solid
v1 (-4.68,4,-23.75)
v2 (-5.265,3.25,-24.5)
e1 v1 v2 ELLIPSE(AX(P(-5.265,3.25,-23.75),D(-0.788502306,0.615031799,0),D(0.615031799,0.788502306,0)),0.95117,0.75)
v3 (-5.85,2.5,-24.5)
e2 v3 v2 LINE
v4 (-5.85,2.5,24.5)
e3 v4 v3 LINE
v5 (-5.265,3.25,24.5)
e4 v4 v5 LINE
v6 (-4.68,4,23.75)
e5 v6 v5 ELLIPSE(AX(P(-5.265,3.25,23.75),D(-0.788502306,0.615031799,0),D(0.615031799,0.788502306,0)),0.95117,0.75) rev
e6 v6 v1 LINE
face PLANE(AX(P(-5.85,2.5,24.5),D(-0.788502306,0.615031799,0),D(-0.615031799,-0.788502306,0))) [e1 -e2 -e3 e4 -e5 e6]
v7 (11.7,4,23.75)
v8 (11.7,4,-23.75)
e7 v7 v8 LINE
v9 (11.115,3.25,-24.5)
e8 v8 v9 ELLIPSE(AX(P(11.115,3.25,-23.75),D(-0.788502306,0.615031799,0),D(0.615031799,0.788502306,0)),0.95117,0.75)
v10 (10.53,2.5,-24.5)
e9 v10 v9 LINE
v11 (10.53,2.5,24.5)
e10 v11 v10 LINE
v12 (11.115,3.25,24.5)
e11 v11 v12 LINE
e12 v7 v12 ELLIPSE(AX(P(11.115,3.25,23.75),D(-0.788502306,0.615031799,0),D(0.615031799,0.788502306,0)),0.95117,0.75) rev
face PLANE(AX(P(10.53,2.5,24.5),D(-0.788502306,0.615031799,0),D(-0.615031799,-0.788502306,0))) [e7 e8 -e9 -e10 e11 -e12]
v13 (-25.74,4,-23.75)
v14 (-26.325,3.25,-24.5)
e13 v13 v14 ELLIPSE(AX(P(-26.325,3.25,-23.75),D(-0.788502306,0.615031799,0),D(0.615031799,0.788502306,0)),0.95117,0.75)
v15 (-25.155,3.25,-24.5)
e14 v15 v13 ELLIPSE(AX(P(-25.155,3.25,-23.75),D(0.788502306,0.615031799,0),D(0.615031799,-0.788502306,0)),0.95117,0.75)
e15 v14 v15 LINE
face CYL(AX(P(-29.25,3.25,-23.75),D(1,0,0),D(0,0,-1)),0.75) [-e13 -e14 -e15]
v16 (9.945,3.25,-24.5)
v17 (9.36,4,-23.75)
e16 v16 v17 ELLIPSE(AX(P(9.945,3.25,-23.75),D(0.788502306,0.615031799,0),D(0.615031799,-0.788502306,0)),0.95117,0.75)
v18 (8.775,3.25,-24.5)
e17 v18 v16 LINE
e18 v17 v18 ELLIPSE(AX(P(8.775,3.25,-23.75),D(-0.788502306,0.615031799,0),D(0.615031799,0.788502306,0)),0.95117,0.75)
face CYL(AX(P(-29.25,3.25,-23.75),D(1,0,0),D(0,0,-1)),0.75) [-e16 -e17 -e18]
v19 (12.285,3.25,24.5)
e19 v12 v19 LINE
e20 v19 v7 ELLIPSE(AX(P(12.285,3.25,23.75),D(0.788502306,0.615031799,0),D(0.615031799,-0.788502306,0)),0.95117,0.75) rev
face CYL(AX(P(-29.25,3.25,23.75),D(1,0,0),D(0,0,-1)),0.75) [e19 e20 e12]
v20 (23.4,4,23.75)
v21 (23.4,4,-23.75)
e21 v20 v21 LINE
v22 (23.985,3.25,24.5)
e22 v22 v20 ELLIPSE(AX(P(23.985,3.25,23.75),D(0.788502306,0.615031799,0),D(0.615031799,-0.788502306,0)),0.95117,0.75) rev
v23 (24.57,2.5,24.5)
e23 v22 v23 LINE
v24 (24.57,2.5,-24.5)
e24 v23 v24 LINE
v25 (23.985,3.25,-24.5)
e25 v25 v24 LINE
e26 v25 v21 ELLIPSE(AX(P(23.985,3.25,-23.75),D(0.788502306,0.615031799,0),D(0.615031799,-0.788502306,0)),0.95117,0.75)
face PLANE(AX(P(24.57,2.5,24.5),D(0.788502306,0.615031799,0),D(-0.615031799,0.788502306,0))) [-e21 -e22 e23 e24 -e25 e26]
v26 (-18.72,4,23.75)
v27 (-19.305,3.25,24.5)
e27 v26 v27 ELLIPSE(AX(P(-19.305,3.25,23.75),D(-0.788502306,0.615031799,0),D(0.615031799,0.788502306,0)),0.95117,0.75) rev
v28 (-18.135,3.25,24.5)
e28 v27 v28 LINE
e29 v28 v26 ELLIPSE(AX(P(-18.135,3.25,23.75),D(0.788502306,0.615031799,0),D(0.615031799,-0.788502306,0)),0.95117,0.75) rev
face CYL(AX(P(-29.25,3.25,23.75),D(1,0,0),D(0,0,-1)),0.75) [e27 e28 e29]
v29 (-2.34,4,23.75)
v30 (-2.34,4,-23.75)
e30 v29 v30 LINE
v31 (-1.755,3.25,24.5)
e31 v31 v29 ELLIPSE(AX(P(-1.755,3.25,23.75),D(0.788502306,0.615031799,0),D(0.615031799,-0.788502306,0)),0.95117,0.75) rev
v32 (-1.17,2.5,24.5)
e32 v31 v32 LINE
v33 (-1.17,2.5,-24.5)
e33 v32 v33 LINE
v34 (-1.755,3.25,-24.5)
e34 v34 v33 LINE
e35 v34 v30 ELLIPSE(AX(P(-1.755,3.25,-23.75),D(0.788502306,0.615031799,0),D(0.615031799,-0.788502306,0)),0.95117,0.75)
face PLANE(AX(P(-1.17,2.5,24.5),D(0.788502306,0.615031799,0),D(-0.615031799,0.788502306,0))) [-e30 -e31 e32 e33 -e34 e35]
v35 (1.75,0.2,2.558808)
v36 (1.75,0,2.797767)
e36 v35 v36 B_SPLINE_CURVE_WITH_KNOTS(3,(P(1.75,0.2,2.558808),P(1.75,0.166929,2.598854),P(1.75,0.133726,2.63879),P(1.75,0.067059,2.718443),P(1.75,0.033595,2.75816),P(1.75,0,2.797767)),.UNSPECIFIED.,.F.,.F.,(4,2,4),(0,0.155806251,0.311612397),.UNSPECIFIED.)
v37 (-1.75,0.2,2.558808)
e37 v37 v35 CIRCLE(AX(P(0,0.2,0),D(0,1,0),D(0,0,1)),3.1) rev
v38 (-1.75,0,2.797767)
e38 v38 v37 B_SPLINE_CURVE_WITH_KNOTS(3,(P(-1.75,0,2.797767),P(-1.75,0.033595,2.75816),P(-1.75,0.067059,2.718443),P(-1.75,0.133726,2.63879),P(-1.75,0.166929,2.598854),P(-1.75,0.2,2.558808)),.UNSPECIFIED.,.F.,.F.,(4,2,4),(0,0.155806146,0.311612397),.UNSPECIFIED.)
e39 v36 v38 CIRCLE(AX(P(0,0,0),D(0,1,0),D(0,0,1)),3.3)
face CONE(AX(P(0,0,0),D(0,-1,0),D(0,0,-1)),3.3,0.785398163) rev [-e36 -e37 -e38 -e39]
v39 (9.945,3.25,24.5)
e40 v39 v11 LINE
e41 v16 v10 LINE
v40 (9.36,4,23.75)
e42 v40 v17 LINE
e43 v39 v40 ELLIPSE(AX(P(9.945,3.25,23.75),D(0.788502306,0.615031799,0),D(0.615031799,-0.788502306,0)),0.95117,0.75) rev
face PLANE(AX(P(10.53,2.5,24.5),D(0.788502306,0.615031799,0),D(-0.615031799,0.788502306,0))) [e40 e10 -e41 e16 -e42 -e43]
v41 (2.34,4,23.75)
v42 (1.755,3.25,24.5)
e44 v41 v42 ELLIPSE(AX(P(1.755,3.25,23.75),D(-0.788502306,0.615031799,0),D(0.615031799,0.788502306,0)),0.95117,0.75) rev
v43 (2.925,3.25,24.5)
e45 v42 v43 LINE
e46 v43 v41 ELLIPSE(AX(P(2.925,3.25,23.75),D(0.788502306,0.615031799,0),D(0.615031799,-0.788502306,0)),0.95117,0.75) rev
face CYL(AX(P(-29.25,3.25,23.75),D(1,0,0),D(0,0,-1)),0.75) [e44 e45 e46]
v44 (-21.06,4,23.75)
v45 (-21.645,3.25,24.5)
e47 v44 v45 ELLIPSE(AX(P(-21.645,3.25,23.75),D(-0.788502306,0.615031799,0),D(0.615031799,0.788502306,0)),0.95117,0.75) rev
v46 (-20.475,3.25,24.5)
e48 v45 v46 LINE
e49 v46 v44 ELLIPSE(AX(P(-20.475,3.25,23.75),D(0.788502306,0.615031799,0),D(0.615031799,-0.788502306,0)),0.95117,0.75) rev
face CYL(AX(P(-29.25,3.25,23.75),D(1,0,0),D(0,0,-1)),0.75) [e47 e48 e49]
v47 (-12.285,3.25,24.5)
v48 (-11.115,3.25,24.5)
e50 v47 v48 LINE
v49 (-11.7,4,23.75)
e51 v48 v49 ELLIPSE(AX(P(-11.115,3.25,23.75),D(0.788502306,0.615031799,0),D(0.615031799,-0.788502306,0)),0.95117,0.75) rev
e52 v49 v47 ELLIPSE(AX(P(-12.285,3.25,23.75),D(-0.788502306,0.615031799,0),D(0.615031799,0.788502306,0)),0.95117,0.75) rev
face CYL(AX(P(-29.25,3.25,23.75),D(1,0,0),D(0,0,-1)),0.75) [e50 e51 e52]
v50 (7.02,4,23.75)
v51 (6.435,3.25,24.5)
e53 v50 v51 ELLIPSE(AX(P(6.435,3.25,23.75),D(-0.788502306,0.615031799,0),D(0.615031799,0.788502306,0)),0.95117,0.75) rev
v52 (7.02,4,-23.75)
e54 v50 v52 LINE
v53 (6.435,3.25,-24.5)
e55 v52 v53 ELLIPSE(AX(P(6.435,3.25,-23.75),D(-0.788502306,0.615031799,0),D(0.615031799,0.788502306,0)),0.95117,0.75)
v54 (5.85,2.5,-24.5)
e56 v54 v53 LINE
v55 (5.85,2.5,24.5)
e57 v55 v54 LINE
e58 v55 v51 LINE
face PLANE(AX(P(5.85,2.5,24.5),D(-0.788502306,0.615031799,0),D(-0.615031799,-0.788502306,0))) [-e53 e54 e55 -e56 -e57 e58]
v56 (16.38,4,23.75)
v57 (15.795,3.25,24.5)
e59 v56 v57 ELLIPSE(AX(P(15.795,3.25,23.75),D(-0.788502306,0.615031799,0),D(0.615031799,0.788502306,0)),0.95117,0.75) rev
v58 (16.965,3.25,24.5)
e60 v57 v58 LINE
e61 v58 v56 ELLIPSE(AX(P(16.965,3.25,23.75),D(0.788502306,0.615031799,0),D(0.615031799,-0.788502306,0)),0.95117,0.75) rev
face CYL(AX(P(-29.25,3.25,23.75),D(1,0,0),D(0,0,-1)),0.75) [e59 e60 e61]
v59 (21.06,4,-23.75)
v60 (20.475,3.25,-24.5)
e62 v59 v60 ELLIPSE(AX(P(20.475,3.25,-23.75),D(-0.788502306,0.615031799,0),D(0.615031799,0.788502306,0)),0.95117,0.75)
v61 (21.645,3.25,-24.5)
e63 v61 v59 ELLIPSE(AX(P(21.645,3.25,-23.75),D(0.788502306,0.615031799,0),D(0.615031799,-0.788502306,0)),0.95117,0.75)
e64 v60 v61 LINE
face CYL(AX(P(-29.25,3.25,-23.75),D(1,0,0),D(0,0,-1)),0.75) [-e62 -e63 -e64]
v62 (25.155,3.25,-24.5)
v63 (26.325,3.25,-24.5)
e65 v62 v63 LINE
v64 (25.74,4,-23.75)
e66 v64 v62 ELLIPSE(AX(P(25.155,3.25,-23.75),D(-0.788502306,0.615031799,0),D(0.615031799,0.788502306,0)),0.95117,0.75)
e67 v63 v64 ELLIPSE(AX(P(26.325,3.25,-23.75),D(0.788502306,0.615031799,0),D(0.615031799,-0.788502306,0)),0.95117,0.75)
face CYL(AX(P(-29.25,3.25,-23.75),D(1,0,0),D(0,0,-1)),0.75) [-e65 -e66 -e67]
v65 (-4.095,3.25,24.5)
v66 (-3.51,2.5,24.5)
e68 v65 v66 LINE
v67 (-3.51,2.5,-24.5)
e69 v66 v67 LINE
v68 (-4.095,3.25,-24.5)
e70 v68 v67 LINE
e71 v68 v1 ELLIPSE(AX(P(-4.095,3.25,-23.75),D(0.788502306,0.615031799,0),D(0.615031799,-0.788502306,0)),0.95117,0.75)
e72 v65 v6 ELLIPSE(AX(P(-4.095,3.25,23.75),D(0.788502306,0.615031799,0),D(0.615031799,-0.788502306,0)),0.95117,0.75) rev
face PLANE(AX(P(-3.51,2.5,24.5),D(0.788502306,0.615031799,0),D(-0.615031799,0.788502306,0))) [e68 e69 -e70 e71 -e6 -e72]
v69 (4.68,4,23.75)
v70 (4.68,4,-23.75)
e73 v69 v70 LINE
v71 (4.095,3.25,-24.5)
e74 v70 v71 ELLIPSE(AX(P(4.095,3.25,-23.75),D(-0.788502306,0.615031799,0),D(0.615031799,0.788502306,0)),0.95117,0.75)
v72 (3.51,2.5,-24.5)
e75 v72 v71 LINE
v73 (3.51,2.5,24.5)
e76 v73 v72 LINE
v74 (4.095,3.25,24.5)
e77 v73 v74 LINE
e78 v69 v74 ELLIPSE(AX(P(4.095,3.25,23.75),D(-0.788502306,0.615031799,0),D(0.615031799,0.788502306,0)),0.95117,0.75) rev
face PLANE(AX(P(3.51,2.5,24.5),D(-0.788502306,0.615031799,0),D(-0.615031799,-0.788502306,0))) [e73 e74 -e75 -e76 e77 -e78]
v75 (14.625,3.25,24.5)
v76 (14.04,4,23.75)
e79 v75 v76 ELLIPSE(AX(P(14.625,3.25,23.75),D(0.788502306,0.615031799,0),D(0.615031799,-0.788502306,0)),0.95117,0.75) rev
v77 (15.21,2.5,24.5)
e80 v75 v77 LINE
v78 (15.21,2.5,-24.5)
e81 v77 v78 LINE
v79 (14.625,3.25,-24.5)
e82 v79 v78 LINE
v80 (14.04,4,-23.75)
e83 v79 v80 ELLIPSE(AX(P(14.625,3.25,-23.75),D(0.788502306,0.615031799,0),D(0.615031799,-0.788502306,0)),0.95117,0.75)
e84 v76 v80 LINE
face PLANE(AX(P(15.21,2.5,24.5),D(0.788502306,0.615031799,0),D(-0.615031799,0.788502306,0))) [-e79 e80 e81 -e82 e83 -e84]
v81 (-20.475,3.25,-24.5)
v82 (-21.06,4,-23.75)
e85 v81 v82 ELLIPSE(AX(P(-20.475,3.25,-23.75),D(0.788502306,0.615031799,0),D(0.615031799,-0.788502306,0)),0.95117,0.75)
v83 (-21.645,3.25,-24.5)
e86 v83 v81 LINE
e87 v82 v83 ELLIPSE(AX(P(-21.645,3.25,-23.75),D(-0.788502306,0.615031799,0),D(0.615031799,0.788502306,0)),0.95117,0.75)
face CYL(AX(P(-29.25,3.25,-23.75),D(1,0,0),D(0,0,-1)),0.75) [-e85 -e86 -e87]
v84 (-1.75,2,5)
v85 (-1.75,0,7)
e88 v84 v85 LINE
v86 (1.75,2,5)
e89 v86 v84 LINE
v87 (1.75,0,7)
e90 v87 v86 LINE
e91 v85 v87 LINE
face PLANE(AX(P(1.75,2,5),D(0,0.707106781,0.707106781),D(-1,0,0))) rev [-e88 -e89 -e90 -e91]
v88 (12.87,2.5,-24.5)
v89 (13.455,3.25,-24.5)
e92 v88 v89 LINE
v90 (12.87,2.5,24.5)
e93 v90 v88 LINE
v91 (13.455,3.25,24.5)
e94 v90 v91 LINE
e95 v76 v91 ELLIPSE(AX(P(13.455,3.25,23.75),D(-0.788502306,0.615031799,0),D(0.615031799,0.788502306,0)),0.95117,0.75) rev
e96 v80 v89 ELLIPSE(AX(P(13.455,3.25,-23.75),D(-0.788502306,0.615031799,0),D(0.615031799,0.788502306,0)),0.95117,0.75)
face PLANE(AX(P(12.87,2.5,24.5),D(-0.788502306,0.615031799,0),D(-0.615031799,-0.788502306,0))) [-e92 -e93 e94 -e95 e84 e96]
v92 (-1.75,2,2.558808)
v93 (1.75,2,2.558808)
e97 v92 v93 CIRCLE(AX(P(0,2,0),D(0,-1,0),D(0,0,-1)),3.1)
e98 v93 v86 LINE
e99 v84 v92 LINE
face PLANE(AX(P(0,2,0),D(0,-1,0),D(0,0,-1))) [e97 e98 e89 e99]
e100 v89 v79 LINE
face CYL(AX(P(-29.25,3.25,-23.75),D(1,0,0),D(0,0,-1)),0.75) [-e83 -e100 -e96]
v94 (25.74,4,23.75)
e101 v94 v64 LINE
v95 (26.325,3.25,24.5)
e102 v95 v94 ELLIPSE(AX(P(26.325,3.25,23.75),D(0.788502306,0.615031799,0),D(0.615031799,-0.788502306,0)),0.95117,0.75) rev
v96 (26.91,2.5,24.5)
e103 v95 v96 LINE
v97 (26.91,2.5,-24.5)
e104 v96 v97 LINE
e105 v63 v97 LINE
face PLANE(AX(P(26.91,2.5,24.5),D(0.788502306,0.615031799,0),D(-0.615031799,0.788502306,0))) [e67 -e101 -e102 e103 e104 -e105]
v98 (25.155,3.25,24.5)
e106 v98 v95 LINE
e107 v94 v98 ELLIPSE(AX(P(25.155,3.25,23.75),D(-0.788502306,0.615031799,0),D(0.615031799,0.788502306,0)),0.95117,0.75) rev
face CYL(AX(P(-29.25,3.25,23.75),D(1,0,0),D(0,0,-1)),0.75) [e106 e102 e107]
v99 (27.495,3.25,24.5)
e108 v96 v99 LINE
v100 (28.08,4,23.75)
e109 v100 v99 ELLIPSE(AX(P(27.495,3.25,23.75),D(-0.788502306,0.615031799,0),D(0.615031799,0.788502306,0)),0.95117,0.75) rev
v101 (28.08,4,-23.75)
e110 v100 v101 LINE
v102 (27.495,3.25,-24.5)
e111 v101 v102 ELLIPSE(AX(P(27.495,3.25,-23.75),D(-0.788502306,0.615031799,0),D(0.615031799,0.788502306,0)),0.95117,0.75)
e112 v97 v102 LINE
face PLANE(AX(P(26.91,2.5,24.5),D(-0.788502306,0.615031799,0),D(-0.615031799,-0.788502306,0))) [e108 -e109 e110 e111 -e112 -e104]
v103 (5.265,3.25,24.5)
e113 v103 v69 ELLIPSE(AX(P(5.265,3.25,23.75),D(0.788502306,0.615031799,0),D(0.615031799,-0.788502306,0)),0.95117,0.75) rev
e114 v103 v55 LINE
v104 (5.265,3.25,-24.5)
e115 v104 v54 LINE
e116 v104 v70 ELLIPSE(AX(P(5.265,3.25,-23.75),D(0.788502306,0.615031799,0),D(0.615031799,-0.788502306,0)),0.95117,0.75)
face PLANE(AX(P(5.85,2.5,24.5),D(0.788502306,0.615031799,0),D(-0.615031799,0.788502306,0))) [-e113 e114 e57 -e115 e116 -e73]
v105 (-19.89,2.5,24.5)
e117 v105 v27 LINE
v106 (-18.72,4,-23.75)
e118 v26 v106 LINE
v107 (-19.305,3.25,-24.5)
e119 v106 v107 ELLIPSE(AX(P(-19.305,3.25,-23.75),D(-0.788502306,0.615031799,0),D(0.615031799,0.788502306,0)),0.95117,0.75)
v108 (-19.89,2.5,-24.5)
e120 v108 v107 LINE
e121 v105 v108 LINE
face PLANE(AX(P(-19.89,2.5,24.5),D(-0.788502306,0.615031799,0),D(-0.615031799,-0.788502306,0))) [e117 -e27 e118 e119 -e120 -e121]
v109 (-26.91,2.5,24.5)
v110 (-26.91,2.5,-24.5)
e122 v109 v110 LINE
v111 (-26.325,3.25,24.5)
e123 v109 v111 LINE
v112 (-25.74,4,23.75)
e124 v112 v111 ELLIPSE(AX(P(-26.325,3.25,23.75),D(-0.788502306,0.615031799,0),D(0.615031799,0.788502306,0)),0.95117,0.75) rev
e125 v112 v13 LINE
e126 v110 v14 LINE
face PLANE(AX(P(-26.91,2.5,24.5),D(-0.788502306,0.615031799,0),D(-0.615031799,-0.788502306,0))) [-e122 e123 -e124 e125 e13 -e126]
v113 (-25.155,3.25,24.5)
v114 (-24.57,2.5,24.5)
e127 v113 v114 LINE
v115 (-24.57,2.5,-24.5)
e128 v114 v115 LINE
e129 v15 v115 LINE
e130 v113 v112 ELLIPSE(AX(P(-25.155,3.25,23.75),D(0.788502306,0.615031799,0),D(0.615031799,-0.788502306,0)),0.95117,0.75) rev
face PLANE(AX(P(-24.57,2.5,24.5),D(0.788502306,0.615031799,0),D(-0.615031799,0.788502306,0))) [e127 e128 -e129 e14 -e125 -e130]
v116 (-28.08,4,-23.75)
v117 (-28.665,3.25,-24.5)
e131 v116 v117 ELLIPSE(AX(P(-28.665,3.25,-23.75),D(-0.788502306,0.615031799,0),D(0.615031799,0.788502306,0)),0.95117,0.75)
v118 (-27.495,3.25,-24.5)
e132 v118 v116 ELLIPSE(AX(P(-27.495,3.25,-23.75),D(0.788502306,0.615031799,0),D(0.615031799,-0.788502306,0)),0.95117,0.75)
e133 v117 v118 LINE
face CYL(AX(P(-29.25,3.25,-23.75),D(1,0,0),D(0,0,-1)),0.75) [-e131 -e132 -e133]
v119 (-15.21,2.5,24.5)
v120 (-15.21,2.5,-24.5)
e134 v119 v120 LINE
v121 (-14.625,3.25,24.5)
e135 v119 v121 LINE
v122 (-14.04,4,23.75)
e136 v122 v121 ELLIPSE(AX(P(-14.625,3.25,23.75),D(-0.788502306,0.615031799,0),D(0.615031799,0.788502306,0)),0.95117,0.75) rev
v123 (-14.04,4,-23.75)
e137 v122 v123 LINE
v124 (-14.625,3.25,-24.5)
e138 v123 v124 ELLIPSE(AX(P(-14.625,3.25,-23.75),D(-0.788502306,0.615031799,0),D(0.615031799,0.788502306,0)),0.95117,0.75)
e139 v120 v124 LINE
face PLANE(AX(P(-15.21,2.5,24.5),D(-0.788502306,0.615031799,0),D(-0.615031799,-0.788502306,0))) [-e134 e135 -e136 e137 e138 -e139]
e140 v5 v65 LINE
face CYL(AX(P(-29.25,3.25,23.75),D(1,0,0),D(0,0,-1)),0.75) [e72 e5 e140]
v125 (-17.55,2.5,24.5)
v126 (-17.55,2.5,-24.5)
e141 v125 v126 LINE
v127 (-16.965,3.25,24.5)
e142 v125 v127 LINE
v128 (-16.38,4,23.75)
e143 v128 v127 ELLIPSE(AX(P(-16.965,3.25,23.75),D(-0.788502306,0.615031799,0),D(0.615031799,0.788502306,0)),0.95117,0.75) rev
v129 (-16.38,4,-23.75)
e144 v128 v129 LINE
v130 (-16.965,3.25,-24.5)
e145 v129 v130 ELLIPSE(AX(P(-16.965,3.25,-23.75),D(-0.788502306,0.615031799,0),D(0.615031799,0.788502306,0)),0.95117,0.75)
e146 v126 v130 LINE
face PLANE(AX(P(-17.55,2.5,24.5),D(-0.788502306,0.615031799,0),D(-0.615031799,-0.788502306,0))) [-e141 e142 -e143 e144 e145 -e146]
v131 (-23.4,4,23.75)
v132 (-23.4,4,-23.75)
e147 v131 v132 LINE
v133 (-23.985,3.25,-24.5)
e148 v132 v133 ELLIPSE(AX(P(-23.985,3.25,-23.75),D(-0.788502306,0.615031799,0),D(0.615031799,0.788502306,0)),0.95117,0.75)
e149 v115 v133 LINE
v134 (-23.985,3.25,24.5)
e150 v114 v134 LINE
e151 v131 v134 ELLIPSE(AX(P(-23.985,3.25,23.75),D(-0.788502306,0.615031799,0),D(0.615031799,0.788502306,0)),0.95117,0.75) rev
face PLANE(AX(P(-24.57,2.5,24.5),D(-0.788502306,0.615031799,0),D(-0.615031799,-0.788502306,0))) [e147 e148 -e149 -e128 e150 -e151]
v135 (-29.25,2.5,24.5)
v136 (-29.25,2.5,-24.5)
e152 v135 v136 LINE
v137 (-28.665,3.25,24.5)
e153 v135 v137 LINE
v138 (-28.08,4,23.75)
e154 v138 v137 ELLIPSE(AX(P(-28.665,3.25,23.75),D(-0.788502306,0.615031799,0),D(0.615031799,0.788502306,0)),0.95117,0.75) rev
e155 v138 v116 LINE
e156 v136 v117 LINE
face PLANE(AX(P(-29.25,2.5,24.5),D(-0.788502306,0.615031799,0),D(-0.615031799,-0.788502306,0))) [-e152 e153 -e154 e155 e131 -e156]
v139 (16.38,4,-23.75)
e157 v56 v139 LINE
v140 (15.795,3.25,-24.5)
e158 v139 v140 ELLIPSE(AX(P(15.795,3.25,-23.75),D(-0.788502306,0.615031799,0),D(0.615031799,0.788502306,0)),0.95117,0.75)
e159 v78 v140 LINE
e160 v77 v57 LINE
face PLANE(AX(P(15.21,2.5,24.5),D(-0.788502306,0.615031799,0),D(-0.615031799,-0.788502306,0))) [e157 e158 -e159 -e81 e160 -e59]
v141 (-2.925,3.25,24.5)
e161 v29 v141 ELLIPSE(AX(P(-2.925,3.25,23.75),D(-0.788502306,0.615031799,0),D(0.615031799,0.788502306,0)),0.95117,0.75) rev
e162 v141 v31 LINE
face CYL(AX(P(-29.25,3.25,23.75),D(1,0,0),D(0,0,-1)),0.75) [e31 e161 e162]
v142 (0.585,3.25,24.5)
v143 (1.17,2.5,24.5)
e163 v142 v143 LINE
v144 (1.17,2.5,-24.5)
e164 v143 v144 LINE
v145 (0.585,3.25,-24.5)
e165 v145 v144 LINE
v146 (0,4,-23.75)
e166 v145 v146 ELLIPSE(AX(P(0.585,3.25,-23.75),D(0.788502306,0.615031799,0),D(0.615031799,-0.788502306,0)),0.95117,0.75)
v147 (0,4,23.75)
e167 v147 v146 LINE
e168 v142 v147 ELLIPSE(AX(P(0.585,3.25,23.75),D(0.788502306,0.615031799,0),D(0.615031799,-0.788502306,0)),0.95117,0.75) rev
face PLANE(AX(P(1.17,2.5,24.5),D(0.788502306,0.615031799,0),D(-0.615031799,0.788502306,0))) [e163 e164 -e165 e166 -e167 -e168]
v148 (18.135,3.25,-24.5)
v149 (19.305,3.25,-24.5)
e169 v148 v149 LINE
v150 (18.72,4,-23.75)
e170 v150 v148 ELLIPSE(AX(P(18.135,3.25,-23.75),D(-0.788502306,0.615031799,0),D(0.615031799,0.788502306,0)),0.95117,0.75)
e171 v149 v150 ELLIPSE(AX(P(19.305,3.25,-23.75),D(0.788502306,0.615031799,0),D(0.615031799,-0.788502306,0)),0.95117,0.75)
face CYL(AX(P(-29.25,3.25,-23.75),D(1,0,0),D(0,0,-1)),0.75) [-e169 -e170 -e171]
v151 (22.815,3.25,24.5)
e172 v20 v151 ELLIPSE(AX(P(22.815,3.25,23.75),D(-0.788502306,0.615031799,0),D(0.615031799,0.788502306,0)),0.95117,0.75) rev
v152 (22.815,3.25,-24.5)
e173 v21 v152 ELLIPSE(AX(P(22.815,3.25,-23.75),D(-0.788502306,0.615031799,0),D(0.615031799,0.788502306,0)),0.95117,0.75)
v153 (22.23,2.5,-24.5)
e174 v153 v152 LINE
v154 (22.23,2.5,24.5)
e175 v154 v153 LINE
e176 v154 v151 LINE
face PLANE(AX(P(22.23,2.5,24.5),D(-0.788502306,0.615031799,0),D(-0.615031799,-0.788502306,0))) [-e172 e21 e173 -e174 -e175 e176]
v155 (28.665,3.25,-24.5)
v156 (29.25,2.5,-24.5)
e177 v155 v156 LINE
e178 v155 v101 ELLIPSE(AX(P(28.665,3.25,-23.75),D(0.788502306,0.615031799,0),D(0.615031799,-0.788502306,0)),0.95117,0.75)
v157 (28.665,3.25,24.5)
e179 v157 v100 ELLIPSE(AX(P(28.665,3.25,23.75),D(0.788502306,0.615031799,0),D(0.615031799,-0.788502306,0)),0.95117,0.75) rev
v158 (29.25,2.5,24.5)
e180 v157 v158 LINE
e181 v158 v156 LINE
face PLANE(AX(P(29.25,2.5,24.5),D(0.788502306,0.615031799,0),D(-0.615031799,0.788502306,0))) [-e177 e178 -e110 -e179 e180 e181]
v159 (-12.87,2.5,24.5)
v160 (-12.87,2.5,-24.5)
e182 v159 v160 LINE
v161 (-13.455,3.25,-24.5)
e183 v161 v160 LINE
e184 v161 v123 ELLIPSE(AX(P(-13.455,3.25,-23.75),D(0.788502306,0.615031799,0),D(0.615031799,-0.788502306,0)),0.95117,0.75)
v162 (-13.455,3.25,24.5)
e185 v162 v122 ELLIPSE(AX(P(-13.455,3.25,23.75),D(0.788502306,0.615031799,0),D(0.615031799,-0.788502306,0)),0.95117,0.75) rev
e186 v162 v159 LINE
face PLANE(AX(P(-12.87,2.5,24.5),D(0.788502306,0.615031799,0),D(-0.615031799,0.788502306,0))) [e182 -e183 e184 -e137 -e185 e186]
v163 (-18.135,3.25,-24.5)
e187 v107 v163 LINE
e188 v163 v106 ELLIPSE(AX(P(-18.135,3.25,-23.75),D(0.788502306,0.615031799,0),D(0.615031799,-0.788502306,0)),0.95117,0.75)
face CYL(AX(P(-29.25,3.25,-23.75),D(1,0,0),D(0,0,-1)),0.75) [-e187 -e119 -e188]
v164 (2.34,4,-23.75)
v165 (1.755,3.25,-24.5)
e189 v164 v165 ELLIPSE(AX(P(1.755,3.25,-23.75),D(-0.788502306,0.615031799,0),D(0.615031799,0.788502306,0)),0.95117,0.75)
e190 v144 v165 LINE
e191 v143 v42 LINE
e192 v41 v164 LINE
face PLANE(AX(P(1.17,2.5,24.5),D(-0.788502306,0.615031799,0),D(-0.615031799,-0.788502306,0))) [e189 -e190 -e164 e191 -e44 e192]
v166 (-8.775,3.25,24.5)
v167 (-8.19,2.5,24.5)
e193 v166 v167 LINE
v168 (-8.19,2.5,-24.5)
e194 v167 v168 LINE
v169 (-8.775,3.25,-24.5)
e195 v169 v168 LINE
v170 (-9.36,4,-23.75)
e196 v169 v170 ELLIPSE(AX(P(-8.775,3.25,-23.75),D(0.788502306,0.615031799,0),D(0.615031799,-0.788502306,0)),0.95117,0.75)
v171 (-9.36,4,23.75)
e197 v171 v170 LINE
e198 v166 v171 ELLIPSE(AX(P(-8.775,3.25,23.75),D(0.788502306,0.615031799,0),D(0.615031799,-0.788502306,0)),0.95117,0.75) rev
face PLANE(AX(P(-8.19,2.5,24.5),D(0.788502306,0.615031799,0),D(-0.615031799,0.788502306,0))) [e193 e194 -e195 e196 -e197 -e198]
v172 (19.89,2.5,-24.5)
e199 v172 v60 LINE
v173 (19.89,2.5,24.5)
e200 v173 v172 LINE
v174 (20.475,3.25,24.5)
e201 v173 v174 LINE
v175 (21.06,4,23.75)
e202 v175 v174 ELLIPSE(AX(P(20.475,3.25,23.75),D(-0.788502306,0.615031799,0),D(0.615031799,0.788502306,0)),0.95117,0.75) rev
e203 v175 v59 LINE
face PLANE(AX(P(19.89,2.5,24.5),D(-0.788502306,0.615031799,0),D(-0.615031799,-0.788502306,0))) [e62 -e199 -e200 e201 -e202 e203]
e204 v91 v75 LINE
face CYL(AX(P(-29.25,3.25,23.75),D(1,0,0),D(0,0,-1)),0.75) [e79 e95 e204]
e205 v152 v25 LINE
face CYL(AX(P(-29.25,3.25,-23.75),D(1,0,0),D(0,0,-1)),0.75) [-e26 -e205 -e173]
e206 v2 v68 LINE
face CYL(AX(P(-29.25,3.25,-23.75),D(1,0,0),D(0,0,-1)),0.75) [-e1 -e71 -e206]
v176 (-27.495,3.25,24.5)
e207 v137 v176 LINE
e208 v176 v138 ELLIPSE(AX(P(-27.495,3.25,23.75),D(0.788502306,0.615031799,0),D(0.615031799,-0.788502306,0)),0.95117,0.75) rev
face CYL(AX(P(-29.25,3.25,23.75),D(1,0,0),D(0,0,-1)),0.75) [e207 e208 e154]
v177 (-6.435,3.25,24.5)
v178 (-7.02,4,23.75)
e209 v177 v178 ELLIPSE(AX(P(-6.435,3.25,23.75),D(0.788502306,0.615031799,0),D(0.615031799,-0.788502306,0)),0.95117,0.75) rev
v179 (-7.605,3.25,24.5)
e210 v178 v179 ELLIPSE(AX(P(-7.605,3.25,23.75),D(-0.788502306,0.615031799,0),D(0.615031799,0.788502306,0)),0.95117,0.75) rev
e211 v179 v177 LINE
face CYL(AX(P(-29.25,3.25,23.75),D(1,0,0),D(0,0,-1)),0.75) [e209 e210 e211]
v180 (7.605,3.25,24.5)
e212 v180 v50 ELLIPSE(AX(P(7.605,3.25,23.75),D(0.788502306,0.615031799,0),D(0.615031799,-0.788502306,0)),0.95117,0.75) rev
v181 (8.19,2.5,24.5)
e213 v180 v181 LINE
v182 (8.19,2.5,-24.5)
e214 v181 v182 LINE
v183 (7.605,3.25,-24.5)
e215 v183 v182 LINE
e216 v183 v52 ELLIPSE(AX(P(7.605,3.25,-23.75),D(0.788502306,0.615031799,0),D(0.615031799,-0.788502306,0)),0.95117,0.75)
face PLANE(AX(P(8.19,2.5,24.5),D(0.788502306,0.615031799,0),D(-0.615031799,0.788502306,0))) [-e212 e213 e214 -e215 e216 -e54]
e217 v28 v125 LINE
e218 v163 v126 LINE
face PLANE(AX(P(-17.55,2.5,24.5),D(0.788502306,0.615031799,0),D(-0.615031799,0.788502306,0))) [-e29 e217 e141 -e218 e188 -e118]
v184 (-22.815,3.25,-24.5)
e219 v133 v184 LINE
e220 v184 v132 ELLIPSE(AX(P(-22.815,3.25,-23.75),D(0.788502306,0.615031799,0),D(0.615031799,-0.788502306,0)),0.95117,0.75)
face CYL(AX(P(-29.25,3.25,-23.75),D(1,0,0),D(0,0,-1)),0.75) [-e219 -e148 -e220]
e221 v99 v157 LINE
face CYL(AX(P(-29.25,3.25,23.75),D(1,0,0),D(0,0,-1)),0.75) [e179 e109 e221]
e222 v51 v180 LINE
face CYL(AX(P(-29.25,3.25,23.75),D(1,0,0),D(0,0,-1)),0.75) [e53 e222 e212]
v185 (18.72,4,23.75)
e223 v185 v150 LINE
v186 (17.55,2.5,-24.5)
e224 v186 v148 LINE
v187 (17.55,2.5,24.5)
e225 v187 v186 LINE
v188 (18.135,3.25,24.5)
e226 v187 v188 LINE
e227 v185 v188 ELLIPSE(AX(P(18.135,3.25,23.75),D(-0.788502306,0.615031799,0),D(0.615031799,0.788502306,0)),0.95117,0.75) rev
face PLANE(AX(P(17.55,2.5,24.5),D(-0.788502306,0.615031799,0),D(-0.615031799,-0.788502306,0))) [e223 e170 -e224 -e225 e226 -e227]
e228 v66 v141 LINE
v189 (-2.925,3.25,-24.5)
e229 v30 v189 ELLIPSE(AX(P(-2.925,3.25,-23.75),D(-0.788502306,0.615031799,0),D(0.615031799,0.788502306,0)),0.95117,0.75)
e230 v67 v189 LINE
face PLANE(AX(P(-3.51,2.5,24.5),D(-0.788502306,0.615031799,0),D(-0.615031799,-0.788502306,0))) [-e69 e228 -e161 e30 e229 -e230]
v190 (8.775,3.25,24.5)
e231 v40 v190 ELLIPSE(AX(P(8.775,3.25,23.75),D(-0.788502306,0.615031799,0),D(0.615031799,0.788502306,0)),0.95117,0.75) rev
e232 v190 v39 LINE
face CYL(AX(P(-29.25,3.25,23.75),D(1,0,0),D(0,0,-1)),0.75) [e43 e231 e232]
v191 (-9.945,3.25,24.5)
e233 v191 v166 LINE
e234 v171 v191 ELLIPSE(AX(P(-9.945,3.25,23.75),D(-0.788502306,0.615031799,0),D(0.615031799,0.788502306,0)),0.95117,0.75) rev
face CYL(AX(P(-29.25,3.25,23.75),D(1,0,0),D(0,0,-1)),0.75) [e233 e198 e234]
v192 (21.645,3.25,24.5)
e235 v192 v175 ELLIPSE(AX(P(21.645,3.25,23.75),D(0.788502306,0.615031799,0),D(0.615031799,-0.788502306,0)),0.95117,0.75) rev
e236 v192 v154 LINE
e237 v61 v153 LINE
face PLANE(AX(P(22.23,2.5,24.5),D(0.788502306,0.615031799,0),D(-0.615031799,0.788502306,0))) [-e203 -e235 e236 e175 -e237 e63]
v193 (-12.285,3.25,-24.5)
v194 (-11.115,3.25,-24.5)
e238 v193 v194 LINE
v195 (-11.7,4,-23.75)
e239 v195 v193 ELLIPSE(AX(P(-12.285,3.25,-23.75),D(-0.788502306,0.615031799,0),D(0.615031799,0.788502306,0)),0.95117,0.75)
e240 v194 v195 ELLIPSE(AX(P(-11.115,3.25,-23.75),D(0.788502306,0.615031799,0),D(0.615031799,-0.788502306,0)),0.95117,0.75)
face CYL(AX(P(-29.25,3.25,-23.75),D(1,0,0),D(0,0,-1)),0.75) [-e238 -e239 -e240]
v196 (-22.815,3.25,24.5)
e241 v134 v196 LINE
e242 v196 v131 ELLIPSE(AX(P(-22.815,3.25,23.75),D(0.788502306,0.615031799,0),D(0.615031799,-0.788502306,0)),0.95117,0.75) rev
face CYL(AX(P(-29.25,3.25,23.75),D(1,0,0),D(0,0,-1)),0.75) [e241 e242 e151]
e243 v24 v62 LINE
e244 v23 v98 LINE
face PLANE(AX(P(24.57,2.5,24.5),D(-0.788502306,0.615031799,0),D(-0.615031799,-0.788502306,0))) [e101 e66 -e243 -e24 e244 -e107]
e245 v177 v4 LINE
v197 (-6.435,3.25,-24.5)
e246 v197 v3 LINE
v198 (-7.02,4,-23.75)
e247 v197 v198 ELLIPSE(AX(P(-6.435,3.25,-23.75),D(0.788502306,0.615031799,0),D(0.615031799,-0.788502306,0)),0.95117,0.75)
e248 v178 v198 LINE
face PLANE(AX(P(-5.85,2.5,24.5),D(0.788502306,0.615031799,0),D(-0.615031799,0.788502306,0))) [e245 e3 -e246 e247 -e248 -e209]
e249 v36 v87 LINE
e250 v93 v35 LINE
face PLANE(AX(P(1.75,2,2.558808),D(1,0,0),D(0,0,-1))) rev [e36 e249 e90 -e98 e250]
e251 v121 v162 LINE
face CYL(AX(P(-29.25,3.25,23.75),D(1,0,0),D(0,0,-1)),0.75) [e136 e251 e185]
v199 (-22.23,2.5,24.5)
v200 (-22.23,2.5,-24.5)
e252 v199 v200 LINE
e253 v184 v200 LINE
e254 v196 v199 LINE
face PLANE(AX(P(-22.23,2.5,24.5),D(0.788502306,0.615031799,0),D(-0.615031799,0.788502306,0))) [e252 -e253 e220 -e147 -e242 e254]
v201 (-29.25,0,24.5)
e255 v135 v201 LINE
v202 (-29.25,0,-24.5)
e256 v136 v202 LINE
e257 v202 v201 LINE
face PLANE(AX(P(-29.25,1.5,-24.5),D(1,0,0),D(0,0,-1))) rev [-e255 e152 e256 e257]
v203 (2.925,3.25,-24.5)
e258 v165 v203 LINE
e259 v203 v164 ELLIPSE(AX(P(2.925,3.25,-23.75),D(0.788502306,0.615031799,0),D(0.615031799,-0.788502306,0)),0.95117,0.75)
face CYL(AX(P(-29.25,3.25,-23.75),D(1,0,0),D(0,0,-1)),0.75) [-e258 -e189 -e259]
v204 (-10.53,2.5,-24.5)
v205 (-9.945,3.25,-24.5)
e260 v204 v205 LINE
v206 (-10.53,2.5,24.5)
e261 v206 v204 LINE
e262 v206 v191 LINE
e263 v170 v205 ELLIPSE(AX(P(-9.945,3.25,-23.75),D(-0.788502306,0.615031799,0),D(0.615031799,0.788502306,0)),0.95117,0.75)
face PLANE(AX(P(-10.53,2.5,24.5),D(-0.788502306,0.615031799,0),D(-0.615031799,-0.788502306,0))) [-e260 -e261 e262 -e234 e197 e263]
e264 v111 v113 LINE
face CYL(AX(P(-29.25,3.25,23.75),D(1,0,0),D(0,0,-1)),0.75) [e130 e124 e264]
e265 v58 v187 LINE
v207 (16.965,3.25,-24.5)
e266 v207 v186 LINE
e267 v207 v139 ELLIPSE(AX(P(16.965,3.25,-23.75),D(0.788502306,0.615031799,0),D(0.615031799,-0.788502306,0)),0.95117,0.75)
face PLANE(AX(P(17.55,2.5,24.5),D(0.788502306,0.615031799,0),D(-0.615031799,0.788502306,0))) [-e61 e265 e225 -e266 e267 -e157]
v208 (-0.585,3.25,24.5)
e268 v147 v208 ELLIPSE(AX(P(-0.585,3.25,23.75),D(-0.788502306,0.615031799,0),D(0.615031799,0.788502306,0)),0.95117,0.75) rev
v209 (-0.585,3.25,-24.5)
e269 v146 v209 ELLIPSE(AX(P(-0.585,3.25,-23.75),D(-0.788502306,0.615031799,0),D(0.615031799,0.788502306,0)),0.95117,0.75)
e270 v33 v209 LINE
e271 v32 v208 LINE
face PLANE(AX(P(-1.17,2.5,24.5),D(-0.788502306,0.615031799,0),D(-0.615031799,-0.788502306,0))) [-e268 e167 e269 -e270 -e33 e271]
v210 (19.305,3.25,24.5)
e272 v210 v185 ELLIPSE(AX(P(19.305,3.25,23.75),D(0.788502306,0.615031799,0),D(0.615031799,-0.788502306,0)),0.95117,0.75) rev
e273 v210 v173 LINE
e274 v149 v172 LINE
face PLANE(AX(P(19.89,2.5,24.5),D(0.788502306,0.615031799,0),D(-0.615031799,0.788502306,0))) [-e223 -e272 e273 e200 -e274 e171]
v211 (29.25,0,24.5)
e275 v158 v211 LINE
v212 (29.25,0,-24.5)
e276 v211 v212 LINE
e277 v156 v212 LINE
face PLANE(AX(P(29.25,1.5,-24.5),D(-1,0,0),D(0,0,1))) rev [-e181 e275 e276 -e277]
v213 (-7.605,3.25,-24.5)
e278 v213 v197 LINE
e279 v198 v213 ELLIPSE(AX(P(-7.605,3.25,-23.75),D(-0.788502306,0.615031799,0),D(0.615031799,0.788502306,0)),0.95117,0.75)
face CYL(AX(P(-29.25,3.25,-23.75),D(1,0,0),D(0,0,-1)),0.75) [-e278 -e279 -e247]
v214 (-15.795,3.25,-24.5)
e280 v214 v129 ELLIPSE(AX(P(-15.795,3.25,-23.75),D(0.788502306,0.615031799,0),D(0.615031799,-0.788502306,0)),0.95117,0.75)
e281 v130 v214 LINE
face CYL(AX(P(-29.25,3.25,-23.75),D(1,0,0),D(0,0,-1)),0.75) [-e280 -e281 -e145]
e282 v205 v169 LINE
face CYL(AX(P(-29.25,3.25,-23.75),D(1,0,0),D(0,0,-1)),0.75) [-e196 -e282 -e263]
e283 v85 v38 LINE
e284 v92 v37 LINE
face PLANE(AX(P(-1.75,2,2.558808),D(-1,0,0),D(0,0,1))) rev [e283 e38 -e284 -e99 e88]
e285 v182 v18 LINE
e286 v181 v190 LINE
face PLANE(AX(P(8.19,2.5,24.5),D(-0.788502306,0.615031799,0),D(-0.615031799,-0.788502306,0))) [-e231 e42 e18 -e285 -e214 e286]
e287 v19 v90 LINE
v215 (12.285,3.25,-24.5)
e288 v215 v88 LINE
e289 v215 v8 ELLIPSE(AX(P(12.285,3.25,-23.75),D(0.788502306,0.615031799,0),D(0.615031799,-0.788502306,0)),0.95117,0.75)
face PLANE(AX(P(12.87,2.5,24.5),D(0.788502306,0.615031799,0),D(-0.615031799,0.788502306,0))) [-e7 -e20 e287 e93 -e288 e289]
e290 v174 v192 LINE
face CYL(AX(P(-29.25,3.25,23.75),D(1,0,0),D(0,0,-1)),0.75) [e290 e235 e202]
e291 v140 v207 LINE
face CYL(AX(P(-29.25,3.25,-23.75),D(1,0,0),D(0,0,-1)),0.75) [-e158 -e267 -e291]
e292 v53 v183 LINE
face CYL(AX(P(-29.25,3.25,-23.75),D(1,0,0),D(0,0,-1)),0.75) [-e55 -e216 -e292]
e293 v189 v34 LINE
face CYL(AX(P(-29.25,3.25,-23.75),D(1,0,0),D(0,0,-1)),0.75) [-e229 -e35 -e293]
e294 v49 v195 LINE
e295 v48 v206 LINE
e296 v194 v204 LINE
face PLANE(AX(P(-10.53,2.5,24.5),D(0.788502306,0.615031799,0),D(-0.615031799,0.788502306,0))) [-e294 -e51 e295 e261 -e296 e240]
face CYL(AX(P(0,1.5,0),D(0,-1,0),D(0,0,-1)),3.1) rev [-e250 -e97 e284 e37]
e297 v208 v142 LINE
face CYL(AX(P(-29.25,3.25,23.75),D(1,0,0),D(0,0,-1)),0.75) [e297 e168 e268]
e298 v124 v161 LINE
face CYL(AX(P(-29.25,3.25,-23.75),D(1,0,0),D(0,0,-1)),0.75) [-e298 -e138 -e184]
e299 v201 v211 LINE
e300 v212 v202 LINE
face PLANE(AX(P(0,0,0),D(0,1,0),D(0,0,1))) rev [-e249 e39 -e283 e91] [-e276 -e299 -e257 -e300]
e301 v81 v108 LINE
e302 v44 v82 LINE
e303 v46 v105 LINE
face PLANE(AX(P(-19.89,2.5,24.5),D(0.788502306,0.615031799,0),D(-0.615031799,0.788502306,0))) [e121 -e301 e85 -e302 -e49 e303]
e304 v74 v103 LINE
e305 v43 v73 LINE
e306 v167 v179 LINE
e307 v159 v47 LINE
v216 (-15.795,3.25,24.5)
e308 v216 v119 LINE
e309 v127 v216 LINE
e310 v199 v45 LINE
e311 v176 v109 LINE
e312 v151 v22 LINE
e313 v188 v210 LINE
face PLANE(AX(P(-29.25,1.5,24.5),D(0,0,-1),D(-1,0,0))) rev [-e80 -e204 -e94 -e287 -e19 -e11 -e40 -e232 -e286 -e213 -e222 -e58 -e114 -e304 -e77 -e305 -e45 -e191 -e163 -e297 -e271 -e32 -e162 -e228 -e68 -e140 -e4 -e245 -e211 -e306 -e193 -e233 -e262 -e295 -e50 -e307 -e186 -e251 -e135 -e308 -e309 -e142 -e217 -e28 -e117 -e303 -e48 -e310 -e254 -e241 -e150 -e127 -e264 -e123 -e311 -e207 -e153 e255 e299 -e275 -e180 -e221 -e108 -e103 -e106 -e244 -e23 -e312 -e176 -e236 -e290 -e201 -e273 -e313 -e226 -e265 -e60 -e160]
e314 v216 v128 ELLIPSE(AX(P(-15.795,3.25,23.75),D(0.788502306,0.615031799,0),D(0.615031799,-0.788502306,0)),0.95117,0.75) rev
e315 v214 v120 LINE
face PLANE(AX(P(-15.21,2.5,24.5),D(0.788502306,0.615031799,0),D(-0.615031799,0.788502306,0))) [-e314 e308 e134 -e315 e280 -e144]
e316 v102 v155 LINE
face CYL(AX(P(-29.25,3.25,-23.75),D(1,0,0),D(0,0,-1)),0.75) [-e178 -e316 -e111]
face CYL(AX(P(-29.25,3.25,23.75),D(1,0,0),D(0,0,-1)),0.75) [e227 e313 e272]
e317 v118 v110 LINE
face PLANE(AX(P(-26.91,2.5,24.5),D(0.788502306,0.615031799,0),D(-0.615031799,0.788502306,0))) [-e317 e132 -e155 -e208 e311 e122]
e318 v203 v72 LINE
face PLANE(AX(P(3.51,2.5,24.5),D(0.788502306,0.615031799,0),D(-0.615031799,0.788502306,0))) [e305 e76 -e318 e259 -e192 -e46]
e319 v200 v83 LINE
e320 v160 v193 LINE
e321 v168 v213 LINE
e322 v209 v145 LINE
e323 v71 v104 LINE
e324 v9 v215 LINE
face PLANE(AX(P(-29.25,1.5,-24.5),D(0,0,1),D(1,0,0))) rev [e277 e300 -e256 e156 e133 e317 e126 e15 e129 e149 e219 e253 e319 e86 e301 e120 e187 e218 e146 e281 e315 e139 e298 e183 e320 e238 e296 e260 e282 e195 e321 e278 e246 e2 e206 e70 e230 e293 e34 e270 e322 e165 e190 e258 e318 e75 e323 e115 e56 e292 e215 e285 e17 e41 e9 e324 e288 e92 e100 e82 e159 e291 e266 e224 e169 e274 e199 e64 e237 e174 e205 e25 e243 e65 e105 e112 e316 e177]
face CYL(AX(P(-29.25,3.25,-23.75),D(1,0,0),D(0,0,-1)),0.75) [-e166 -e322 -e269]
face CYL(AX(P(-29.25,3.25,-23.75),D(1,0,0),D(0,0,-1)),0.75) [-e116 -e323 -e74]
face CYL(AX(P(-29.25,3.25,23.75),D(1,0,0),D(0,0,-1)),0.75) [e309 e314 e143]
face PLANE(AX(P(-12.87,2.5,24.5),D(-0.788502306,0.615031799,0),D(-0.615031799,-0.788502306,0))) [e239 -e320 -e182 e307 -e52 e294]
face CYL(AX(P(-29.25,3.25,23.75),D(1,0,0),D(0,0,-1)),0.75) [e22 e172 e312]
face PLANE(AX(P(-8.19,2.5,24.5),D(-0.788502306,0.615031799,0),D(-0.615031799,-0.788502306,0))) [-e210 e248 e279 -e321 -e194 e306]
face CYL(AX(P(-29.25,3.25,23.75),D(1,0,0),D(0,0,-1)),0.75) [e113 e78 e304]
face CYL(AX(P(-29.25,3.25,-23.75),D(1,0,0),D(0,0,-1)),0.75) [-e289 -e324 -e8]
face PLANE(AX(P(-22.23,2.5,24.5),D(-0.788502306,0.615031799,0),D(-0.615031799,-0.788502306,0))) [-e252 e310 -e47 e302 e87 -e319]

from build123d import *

# Parameters (mm, degrees)
SKETCH1_W           = 58.5
SKETCH1_H           = 49
SKETCH1_R           = 3.1
BOSS_EXTRUDE1_DEPTH = 1.5
BOSS_EXTRUDE2_DEPTH = 49
CUT_EXTRUDE1_DEPTH  = 2
CHAMFER2_SIZE       = 0.2
CUT_EXTRUDE3_DEPTH  = 64.549193543
CHAMFER3_SIZE       = 2


with BuildPart() as part:
    # Sketch1 → Boss-Extrude1 (new body)
    with BuildSketch(Plane(origin=(0, 0, 0), x_dir=(1, 0, 0), z_dir=(0, 1, 0))):
        Rectangle(SKETCH1_W, SKETCH1_H)
        with Locations(Location((0, 0, 0), (0, 0, 270))):
            Circle(SKETCH1_R, mode=Mode.SUBTRACT)
    extrude(amount=BOSS_EXTRUDE1_DEPTH)

    # Sketch2 → Boss-Extrude2 (add)
    with BuildSketch(Plane(origin=(0, 0, -24.5), x_dir=(-1, 0, 0), z_dir=(0, 0, -1))):
        Polygon((-29.25, 1.5), (29.25, 1.5), (29.25, 2.5), (28.08, 4), (26.91, 2.5), (25.74, 4), (24.57, 2.5), (23.4, 4), (22.23, 2.5), (21.06, 4), (19.89, 2.5), (18.72, 4), (17.55, 2.5), (16.38, 4), (15.21, 2.5), (14.04, 4), (12.87, 2.5), (11.7, 4), (10.53, 2.5), (9.36, 4), (8.19, 2.5), (7.02, 4), (5.85, 2.5), (4.68, 4), (3.51, 2.5), (2.34, 4), (1.17, 2.5), (0, 4), (-1.17, 2.5), (-2.34, 4), (-3.51, 2.5), (-4.68, 4), (-5.85, 2.5), (-7.02, 4), (-8.19, 2.5), (-9.36, 4), (-10.53, 2.5), (-11.7, 4), (-12.87, 2.5), (-14.04, 4), (-15.21, 2.5), (-16.38, 4), (-17.55, 2.5), (-18.72, 4), (-19.89, 2.5), (-21.06, 4), (-22.23, 2.5), (-23.4, 4), (-24.57, 2.5), (-25.74, 4), (-26.91, 2.5), (-28.08, 4), (-29.25, 2.5), align=None)
    extrude(amount=-BOSS_EXTRUDE2_DEPTH)

    # Sketch3 → Cut-Extrude1 (cut)
    with BuildSketch(Plane(origin=(0, 0, 0), x_dir=(-1, 0, 0), z_dir=(0, -1, 0))):
        with BuildLine():
            Line((-1.75, -2.558808316), (-1.75, -5))
            Line((-1.75, -5), (1.75, -5))
            Line((1.75, -5), (1.75, -2.558808316))
            ThreePointArc((1.75, -2.558808316), (0, 3.1), (-1.75, -2.558808316))
        make_face()
    extrude(amount=-CUT_EXTRUDE1_DEPTH, mode=Mode.SUBTRACT)

    # Chamfer2
    chamfer2_edges = [part.edges().sort_by_distance(p)[0] for p in [
        (0, 0, -3.1),
    ]]
    chamfer(chamfer2_edges, length=CHAMFER2_SIZE)

    # Sketch4 → Cut-Extrude3 (cut, through all)
    with BuildSketch(Plane(origin=(29.25, 0, 0), x_dir=(0, 0, -1), z_dir=(1, 0, 0))):
        with BuildLine():
            Line((-23.75, 4), (-24.5, 4))
            Line((-24.5, 4), (-24.5, 3.25))
            ThreePointArc((-24.5, 3.25), (-24.280330086, 3.780330086), (-23.75, 4))
        make_face()
    cut_extrude3 = extrude(amount=-CUT_EXTRUDE3_DEPTH, mode=Mode.SUBTRACT)

    # Mirror1: Cut-Extrude3 across plane
    add(cut_extrude3.mirror(Plane.XY), mode=Mode.SUBTRACT)

    # Chamfer3
    chamfer3_edges = [part.edges().sort_by_distance(p)[0] for p in [
        (0, 0, 5),
    ]]
    chamfer(chamfer3_edges, length=CHAMFER3_SIZE - 0.0001)  # a hair under: the kernel refuses the full size


solid = part.part
